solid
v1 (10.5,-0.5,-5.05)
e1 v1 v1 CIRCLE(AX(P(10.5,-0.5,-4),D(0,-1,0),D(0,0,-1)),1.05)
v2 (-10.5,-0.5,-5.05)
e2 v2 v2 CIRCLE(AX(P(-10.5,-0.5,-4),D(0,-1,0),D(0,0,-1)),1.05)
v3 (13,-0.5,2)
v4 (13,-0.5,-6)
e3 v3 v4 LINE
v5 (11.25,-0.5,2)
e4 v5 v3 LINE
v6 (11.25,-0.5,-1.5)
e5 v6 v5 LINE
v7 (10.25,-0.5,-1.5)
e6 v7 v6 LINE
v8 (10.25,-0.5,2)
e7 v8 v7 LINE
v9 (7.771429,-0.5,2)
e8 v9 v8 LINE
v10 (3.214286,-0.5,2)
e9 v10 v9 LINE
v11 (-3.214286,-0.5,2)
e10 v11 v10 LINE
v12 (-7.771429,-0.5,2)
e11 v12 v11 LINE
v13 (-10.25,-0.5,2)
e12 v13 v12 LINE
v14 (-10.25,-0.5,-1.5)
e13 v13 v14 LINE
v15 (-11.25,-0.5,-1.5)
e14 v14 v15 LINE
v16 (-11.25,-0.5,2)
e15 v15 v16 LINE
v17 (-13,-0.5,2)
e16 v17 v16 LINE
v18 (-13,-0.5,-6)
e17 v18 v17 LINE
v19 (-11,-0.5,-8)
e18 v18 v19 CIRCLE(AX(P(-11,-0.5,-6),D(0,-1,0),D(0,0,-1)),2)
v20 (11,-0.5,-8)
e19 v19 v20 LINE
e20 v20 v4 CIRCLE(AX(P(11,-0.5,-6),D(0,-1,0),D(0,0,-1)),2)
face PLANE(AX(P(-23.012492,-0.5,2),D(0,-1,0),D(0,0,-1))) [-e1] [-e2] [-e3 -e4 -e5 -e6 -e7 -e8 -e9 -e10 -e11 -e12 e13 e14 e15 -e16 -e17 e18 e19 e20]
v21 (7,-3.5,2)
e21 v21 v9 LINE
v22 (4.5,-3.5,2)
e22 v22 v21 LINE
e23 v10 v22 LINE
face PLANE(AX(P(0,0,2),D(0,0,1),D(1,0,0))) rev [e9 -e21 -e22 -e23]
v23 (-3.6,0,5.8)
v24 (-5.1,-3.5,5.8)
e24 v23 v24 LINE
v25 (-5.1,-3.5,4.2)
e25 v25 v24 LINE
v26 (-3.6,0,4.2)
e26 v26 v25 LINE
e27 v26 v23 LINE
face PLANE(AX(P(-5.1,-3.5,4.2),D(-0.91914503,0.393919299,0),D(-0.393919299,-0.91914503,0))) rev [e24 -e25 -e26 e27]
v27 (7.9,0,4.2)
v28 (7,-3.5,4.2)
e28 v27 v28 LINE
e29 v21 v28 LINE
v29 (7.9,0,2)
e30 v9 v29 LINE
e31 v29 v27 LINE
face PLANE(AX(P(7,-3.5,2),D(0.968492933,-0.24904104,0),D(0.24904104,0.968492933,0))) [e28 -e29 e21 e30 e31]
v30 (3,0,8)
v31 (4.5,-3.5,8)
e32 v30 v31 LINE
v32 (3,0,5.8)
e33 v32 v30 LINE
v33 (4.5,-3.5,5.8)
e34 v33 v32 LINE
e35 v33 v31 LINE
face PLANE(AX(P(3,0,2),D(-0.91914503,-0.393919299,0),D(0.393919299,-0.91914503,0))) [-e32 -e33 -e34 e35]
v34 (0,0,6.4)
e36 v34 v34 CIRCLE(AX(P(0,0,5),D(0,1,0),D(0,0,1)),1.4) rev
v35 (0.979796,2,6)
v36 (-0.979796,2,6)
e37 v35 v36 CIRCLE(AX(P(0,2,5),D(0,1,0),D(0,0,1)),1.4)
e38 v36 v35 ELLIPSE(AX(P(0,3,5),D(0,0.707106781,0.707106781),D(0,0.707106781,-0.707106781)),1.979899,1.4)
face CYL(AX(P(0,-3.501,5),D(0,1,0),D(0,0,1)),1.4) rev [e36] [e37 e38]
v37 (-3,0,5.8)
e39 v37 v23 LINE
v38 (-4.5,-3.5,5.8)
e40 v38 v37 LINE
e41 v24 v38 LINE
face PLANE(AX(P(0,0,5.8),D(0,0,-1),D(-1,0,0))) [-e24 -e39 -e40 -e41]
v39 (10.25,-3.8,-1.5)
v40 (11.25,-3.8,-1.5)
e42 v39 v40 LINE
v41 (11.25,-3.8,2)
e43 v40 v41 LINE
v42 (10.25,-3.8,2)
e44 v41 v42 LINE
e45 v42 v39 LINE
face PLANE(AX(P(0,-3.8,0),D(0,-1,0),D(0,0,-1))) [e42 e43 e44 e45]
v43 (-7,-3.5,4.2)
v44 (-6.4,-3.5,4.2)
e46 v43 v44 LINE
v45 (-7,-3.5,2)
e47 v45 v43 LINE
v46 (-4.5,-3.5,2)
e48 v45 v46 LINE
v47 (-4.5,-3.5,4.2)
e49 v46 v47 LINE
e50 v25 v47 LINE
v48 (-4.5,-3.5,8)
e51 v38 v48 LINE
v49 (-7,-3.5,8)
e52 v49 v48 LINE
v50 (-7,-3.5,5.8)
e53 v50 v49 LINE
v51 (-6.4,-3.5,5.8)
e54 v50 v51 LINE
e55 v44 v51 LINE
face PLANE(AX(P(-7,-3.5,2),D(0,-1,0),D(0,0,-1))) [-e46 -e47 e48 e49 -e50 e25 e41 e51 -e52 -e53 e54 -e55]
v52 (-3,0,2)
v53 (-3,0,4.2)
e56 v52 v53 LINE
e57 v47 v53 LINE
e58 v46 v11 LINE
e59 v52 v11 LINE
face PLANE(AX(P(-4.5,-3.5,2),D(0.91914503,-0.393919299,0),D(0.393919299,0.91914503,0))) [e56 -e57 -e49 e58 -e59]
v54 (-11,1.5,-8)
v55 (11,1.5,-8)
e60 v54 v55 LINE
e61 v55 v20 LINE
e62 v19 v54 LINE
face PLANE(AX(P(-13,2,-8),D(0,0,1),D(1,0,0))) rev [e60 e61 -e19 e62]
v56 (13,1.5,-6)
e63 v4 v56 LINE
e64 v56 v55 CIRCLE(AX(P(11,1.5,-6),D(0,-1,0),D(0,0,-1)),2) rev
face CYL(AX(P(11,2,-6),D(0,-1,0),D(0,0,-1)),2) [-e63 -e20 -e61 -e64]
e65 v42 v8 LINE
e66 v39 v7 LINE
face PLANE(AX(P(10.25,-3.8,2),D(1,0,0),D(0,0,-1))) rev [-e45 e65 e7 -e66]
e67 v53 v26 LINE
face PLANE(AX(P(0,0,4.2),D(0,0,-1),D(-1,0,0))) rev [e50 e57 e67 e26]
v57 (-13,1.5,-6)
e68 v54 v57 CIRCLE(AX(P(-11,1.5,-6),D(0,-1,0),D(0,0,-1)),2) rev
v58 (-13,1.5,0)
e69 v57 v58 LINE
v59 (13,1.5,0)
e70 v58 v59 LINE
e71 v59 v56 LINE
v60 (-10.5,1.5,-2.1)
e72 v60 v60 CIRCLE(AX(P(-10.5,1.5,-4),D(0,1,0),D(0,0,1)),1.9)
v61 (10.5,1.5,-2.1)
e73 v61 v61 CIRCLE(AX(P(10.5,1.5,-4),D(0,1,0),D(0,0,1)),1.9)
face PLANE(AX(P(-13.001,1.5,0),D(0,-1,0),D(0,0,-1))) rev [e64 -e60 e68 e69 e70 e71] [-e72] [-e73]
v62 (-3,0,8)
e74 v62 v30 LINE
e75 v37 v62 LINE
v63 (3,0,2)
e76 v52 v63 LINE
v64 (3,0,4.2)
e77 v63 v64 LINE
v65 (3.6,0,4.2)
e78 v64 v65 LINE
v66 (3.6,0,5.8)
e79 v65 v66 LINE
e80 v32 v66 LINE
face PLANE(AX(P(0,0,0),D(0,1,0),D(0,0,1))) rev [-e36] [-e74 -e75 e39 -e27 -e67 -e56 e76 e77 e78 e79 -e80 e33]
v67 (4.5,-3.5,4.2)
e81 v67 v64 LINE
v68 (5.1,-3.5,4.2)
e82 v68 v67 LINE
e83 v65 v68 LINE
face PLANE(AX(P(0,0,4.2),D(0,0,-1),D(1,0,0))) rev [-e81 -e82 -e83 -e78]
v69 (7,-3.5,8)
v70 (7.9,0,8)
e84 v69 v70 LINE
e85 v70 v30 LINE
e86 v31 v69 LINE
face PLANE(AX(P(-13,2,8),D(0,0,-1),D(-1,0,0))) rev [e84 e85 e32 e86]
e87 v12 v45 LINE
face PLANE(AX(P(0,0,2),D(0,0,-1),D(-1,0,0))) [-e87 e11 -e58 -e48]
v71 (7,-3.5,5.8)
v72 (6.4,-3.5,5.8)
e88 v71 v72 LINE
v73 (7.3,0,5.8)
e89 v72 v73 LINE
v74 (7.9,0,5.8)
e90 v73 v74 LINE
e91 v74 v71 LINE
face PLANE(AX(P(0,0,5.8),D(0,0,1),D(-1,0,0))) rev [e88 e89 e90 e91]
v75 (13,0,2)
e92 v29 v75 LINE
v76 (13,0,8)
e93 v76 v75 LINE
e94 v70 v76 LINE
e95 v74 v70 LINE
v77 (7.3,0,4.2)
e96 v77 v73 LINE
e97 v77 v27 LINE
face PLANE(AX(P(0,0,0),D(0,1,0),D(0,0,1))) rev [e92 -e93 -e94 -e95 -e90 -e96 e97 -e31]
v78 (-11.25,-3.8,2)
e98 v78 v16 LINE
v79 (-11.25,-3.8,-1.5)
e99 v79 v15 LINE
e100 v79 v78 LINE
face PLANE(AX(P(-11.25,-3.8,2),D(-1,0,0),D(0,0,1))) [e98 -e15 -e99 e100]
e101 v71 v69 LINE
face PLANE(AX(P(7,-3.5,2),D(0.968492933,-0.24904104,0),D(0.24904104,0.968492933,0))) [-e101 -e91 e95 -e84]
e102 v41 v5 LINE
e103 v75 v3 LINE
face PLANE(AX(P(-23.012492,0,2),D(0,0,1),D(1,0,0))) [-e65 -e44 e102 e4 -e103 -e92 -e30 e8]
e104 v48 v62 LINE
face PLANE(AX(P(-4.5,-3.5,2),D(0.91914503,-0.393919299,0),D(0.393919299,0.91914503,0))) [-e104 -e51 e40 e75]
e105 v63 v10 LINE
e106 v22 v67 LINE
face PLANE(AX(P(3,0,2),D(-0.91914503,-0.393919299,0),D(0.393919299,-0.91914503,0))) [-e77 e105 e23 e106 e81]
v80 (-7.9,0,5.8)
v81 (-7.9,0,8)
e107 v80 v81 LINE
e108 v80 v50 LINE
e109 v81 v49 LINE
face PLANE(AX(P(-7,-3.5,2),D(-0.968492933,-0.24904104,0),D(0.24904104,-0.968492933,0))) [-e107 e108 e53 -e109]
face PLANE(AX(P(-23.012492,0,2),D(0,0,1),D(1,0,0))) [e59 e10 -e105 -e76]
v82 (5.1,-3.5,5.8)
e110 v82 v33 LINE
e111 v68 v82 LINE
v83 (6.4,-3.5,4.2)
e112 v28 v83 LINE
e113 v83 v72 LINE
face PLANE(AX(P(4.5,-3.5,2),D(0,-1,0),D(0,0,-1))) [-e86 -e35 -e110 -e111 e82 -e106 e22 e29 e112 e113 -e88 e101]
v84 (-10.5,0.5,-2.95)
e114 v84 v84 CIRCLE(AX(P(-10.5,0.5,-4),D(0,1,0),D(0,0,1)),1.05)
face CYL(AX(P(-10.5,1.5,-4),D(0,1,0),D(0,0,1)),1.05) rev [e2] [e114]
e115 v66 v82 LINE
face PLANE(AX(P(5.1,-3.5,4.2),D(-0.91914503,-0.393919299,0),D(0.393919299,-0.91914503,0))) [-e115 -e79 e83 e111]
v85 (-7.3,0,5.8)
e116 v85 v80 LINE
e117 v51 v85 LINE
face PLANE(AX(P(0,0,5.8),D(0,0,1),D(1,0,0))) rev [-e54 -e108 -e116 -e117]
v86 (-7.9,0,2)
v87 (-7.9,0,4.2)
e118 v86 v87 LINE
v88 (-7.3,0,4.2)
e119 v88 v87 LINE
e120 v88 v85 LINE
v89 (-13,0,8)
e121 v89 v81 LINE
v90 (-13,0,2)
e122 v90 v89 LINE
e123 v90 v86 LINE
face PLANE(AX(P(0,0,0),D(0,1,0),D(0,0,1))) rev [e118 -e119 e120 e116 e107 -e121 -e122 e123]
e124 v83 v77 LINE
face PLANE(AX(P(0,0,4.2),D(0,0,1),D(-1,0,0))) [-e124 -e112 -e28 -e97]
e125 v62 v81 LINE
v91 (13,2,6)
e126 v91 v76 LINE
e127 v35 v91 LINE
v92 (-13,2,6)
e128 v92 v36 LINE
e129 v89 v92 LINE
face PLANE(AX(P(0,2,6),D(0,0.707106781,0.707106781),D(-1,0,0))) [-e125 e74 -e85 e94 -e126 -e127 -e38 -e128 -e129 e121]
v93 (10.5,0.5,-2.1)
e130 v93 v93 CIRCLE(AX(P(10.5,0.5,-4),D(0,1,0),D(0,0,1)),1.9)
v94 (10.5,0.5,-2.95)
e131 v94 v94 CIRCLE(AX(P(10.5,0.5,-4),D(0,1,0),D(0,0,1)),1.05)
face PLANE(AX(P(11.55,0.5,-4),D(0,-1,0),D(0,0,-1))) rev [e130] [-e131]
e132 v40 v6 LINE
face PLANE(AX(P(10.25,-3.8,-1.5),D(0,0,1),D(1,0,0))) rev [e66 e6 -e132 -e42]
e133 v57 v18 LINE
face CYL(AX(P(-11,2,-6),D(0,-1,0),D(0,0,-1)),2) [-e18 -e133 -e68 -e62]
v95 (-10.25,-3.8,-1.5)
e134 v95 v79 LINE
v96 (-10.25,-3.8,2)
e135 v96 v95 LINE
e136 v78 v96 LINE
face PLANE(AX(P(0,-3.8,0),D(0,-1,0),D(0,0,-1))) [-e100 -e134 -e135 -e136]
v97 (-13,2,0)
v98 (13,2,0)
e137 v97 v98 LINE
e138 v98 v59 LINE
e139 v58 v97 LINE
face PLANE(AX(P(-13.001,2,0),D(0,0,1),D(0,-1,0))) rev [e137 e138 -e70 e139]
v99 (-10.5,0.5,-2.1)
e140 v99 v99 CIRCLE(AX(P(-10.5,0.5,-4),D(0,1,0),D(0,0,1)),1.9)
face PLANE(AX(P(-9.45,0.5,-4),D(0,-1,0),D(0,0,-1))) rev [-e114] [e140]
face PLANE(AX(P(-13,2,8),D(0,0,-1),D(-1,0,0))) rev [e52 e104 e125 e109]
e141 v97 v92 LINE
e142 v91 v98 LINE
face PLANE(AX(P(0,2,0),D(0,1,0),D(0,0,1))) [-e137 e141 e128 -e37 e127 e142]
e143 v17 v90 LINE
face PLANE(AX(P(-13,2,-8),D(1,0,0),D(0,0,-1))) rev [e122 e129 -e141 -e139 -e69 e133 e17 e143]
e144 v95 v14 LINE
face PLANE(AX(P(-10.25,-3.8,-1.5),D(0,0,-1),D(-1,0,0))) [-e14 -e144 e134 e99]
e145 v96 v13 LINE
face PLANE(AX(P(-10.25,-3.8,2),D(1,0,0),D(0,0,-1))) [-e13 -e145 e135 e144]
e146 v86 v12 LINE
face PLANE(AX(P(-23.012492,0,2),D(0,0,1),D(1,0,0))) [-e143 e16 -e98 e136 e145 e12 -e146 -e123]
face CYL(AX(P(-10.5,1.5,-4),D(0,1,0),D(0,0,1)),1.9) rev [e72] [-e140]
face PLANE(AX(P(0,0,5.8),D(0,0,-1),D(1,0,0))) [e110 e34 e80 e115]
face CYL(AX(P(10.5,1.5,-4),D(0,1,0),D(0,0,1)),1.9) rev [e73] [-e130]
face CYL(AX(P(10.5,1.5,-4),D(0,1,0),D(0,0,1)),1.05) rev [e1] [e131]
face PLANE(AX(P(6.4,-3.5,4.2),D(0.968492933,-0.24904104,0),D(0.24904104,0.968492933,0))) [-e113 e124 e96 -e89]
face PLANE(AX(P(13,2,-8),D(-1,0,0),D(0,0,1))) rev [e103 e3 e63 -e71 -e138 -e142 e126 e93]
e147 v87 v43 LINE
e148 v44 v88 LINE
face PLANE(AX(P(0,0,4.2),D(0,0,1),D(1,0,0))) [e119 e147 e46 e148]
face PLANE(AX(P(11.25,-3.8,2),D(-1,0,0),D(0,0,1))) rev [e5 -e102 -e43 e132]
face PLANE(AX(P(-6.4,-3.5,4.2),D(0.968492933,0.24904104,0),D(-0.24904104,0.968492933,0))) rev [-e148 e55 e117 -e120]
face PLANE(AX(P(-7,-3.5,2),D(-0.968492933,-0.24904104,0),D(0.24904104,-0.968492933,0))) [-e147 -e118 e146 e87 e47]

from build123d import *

# Parameters (mm, degrees)
SKETCH_1_W                   = 26
SKETCH_1_H                   = 16
EXTRUDE_1_DEPTH              = 2
EXTRUDE_3_DEPTH              = 6
CUT_EXTRUDE_1_REACH          = 18.225
SKETCH_5_R                   = 1.4
EXTRUDE_4_REACH              = 29.427
SKETCH_6_W                   = 10
SKETCH_6_H                   = 0.5
CUT_EXTRUDE_2_REACH          = 29.427
SKETCH_7_W                   = 8
SKETCH_7_H                   = 0.5
HOLE_WIZARD_M2_1_D           = 2.1
HOLE_WIZARD_M2_1_CBORE_D     = 3.8
HOLE_WIZARD_M2_1_CBORE_DEPTH = 1
SKETCH_10_W                  = 1
SKETCH_10_H                  = 3.5
EXTRUDE_5_DEPTH              = 3.3
CHAMFER_1_SIZE               = 2
FILLET_2_R                   = 2
CUT_EXTRUDE_3_DEPTH          = 0.8


with BuildPart() as part:
    # ｽｹｯﾁ1 → ﾎﾞｽ - 押し出し1 (new body)
    with BuildSketch(Plane(origin=(0, 0, 0), x_dir=(1, 0, 0), z_dir=(0, 1, 0))):
        Rectangle(SKETCH_1_W, SKETCH_1_H)
    extrude(amount=EXTRUDE_1_DEPTH)

    # ｽｹｯﾁ4 → ﾎﾞｽ - 押し出し3 (add)
    with BuildSketch(Plane.XY.offset(8)):
        Polygon((-7, -3.5), (-4.5, -3.5), (-3, 0), (-7.9, 0), align=None)
        Polygon((3, 0), (4.5, -3.5), (7, -3.5), (7.9, 0), align=None)
    extrude(amount=-EXTRUDE_3_DEPTH)

    # ｽｹｯﾁ5 → ｶｯﾄ - 押し出し1 (cut, up to next)
    with BuildSketch(Plane(origin=(0, 2, 0), x_dir=(1, 0, 0), z_dir=(0, 1, 0)), mode=Mode.PRIVATE) as cut_extrude_1_sk1:
        with Locations(Location((0, -5, 0), (0, 0, 270))):
            Circle(SKETCH_5_R)
    cut_extrude_1_tool1 = extrude(cut_extrude_1_sk1.sketch, amount=-CUT_EXTRUDE_1_REACH, mode=Mode.PRIVATE) & part.part
    add(cut_extrude_1_tool1.solids().sort_by_distance((0, 2, 5))[0], mode=Mode.SUBTRACT)

    # ﾎﾞｽ - 押し出し4: up to this face of the body (flat: up to its plane)
    extrude_4_end = Plane(part.part.faces().sort_by_distance((-13, 1, 0))[0])
    # ｽｹｯﾁ6 → ﾎﾞｽ - 押し出し4 (add, up to the picked face)
    with BuildSketch(Plane(origin=(13, 0, 0), x_dir=(0, 0, -1), z_dir=(1, 0, 0)), mode=Mode.PRIVATE) as extrude_4_sk1:
        with Locations((3, -0.25)):
            Rectangle(SKETCH_6_W, SKETCH_6_H)
    extrude_4_tool1 = split(extrude(extrude_4_sk1.sketch, amount=-EXTRUDE_4_REACH, mode=Mode.PRIVATE), bisect_by=extrude_4_end, keep=Keep.BOTH, mode=Mode.PRIVATE)
    add(extrude_4_tool1.solids().sort_by(Axis((13, -0.25, -3), (-1, 0, 0)))[0])

    # ｽｹｯﾁ7 → ｶｯﾄ - 押し出し2 (cut, up to next)
    with BuildSketch(Plane(origin=(13, 0, 0), x_dir=(0, 0, -1), z_dir=(1, 0, 0)), mode=Mode.PRIVATE) as cut_extrude_2_sk1:
        with Locations((4, 1.75)):
            Rectangle(SKETCH_7_W, SKETCH_7_H)
    cut_extrude_2_tool1 = extrude(cut_extrude_2_sk1.sketch, amount=-CUT_EXTRUDE_2_REACH, mode=Mode.PRIVATE) & part.part
    add(cut_extrude_2_tool1.solids().sort_by_distance((13, 1.75, -4))[0], mode=Mode.SUBTRACT)

    # M2 丸平ねじ用座ぐり穴1 (through all)
    with Locations(Plane(origin=(0, 1.5, 0), x_dir=(1, 0, 0), z_dir=(0, 1, 0))):
        with Locations((10.5, 4)):
            hole_wizard_m2_1 = CounterBoreHole(HOLE_WIZARD_M2_1_D / 2, HOLE_WIZARD_M2_1_CBORE_D / 2, HOLE_WIZARD_M2_1_CBORE_DEPTH)

    # ｽｹｯﾁ10 → ﾎﾞｽ - 押し出し5 (add)
    with BuildSketch(Plane.XZ.offset(0.5)):
        with Locations((10.75, 0.25)):
            Rectangle(SKETCH_10_W, SKETCH_10_H)
    extrude_5 = extrude(amount=EXTRUDE_5_DEPTH)

    # ﾐﾗｰ1: M2 丸平ねじ用座ぐり穴1, ﾎﾞｽ - 押し出し5 across plane
    add(hole_wizard_m2_1.mirror(Plane(origin=(0, 0, 0), x_dir=(0, 0, 1), z_dir=(1, 0, 0))), mode=Mode.SUBTRACT)
    add(extrude_5.mirror(Plane(origin=(0, 0, 0), x_dir=(0, 0, 1), z_dir=(1, 0, 0))))

    # 面取り1
    # the kernel refuses this chamfer: 2 mm, written as the material it takes off along each edge
    with BuildSketch(Plane(origin=(18.143365976, 2, 8), x_dir=(0, 0.02749587661058627, -0.9996219169112968), z_dir=(-1, 0, 0))) as chamfer_1_piece_1:
        Polygon((CHAMFER_1_SIZE * 0.999621916911, CHAMFER_1_SIZE * 0.0274958766106), (-CHAMFER_1_SIZE * 0.0274958766106, CHAMFER_1_SIZE * 0.999621916911), (0, 0), align=None)
    extrude(amount=36.286731952, mode=Mode.SUBTRACT)

    # ﾌｨﾚｯﾄ2
    fillet_2_edges = [part.edges().sort_by_distance(p)[0] for p in [
        (13, 0.5, -8),
        (-13, 0.5, -8),
    ]]
    fillet(fillet_2_edges, radius=FILLET_2_R)

    # ｽｹｯﾁ12 → ｶｯﾄ - 押し出し3 (cut, symmetric)
    with BuildSketch(Plane.XY.offset(5)):
        Polygon((-7.9, 0), (-7, -3.5), (-6.4, -3.5), (-7.3, 0), align=None)
        Polygon((-3, 0), (-4.5, -3.5), (-5.1, -3.5), (-3.6, 0), align=None)
    cut_extrude_3 = extrude(amount=CUT_EXTRUDE_3_DEPTH, both=True, mode=Mode.SUBTRACT)

    # ﾐﾗｰ2: ｶｯﾄ - 押し出し3 across plane
    add(cut_extrude_3.mirror(Plane(origin=(0, 0, 0), x_dir=(0, 0, 1), z_dir=(1, 0, 0))), mode=Mode.SUBTRACT)


solid = part.part
